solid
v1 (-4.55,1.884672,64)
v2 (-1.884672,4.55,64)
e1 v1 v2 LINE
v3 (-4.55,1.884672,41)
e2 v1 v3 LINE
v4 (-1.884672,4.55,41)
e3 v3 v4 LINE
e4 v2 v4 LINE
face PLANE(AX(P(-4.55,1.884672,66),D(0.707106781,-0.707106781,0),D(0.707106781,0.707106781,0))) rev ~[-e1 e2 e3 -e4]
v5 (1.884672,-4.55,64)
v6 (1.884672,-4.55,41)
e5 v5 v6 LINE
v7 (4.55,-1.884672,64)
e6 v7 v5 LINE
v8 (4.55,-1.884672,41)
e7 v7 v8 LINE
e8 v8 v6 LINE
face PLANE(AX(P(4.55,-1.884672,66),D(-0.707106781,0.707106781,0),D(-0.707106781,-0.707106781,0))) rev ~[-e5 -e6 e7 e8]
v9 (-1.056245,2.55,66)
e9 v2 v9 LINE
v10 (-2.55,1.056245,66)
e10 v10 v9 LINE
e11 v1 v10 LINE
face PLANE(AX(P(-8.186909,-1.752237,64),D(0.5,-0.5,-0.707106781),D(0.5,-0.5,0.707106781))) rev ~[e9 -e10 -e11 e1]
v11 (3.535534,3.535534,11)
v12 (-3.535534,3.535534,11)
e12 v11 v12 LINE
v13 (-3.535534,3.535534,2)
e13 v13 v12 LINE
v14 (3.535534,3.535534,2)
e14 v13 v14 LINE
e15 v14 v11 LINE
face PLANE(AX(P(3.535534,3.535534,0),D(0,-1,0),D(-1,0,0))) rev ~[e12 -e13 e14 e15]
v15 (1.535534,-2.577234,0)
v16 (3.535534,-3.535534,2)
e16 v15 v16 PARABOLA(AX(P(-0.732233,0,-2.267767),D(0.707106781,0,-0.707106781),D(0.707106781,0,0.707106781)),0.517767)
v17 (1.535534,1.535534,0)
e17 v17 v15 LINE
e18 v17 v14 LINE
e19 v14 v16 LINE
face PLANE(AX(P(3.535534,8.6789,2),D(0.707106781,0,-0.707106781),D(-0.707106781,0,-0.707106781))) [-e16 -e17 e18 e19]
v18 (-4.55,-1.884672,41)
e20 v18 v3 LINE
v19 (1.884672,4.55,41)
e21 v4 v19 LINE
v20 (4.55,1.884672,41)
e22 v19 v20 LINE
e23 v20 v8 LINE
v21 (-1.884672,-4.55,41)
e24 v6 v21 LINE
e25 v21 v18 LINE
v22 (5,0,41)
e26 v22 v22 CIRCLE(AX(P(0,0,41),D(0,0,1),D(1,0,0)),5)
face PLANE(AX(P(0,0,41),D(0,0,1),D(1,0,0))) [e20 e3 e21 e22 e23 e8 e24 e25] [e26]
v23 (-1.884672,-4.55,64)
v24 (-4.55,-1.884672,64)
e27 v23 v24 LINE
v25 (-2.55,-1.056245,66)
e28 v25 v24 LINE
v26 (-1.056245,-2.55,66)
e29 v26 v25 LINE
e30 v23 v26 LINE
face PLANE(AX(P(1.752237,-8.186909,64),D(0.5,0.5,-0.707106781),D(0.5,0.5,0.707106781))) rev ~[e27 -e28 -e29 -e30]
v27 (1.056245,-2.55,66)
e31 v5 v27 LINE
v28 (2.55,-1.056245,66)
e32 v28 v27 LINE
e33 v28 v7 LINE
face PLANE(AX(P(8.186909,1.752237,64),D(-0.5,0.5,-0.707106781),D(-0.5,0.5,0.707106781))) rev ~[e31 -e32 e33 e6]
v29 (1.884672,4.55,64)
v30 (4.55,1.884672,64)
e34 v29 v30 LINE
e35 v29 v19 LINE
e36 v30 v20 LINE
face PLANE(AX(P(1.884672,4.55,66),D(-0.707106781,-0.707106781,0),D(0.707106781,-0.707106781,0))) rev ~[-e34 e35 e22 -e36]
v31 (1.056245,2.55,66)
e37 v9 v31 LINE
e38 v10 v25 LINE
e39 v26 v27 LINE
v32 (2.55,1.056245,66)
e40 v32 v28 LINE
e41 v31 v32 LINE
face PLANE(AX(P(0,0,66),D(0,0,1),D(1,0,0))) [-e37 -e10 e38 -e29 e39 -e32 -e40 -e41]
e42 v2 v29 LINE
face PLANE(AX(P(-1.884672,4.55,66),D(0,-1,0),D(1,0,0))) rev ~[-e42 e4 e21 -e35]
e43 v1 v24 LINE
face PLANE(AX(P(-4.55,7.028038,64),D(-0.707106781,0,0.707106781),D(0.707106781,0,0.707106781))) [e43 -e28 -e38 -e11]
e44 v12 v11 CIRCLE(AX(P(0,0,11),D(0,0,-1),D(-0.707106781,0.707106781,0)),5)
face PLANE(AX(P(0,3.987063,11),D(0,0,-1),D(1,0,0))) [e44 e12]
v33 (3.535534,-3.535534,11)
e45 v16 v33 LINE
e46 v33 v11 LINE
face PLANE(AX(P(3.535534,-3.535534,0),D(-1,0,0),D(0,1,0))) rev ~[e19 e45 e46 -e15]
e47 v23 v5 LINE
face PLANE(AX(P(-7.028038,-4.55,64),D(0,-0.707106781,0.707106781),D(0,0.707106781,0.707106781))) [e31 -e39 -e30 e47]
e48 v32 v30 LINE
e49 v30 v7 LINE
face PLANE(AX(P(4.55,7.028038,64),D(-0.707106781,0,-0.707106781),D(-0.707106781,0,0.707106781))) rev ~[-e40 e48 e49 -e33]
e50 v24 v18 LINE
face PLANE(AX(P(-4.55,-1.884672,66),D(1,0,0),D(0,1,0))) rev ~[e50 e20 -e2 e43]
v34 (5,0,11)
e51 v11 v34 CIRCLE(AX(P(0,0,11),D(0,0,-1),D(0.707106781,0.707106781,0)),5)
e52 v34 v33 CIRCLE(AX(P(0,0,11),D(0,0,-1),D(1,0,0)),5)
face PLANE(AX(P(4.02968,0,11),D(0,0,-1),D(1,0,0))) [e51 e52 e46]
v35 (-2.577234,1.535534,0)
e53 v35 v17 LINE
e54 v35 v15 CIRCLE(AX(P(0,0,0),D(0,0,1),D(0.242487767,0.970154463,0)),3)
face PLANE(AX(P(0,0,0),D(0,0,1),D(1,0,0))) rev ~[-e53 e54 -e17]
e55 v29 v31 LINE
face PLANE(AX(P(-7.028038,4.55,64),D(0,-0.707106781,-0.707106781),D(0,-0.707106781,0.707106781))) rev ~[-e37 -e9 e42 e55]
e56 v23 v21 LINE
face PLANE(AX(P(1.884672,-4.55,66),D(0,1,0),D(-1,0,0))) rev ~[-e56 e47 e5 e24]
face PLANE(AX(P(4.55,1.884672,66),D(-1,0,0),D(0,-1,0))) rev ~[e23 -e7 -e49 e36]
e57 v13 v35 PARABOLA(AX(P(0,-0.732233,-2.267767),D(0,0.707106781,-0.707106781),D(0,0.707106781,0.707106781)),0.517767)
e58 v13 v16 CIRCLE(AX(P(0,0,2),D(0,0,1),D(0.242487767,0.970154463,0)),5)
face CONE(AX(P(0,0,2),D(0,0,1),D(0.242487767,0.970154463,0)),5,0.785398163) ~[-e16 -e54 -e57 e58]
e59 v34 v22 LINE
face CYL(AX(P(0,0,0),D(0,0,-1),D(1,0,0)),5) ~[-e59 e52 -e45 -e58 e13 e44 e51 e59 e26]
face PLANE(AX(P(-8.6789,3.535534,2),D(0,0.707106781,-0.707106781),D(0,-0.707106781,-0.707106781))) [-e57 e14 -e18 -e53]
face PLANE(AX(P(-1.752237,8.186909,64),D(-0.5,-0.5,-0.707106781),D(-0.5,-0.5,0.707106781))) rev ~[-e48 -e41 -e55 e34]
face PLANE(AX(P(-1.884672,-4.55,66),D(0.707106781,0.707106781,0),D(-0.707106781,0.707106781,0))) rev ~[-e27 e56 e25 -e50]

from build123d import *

# Parameters (mm, degrees)
F0_R         = 5
F1_DEPTH     = 66
F2_R         = 5
F3_DEPTH     = 25
F5_DEPTH     = 11
F6_T1_DEPTH  = 14.0560753695
F6_T3_DEPTH  = 14.0560753695
F6_T5_DEPTH  = 14.0560753695
F6_T7_DEPTH  = 14.0560753695
F6_T9_DEPTH  = 14.0560753695
F6_T11_DEPTH = 14.0560753695
F6_T13_DEPTH = 17.3577997637
F6_T15_DEPTH = 17.3577997637
F6_T18_ANGLE = 298.0668340959


# Not quite as in the source:
# - a fillet or chamfer that OpenCascade refuses, or shapes differently, is made with other operations: its cross-section is extruded or revolved along the edge and cut away or added


with BuildPart() as f1:
    # F0 (on Top) → F1 (new body)
    with BuildSketch(Plane.XY):
        Circle(F0_R)
    extrude(amount=F1_DEPTH)

    # F2 (on face) → F3 (cut)
    with BuildSketch(Plane.XY.offset(66)):
        Circle(F2_R)
        Polygon((4.55, 1.8846717088), (4.55, -1.8846717088), (1.8846717088, -4.55), (-1.8846717088, -4.55), (-4.55, -1.8846717088), (-4.55, 1.8846717088), (-1.8846717088, 4.55), (1.8846717088, 4.55), align=None, mode=Mode.SUBTRACT)
    extrude(amount=-F3_DEPTH, mode=Mode.SUBTRACT)

    # F4 (on face) → F5 (cut)
    with BuildSketch(Plane(origin=(0, 0, 0), x_dir=(1, 0, 0), z_dir=(0, 0, -1))):
        with BuildLine():
            ThreePointArc((5, 0), (4.6193976626, 1.9134171618), (3.5355339059, 3.5355339059))
            Line((3.5355339059, 3.5355339059), (3.5355339059, -3.5355339059))
            ThreePointArc((3.5355339059, -3.5355339059), (4.6193976626, -1.9134171618), (5, 0))
        make_face()
        with BuildLine():
            ThreePointArc((-3.5355339059, -3.5355339059), (0, -5), (3.5355339059, -3.5355339059))
            Line((3.5355339059, -3.5355339059), (-3.5355339059, -3.5355339059))
        make_face()
    extrude(amount=-F5_DEPTH, mode=Mode.SUBTRACT)

    # F6: chamfer of 2 on 11 edges, made by hand

    # F6_s2 → F6_t1 (cut)
    with BuildSketch(Plane(origin=(-4.9695731053, 4.9695731053, 0), x_dir=(0, 0, 1), z_dir=(0.7071067812, -0.7071067812, 0))):
        Polygon((64, -4.55), (66, -2.55), (66, -4.55), align=None)
    extrude(amount=F6_T1_DEPTH, mode=Mode.SUBTRACT)

    # F6_s4 → F6_t3 (cut)
    with BuildSketch(Plane.XZ.offset(-7.0280376847)):
        Polygon((4.55, 64), (2.55, 66), (4.55, 66), align=None)
        Polygon((-4.55, 64), (-2.55, 66), (-4.55, 66), align=None)
    extrude(amount=F6_T3_DEPTH, mode=Mode.SUBTRACT)

    # F6_s6 → F6_t5 (cut)
    with BuildSketch(Plane(origin=(4.9695731053, 4.9695731053, 0), x_dir=(0, 0, 1), z_dir=(-0.7071067812, -0.7071067812, 0))):
        Polygon((64, -4.55), (66, -2.55), (66, -4.55), align=None)
    extrude(amount=F6_T5_DEPTH, mode=Mode.SUBTRACT)

    # F6_s8 → F6_t7 (cut)
    with BuildSketch(Plane.YZ.offset(-7.0280376847)):
        Polygon((-4.55, 64), (-2.55, 66), (-4.55, 66), align=None)
        Polygon((4.55, 64), (2.55, 66), (4.55, 66), align=None)
    extrude(amount=F6_T7_DEPTH, mode=Mode.SUBTRACT)

    # F6_s10 → F6_t9 (cut)
    with BuildSketch(Plane(origin=(4.9695731053, -4.9695731053, 0), x_dir=(0, 0, 1), z_dir=(-0.7071067812, 0.7071067812, 0))):
        Polygon((64, -4.55), (66, -2.55), (66, -4.55), align=None)
    extrude(amount=F6_T9_DEPTH, mode=Mode.SUBTRACT)

    # F6_s12 → F6_t11 (cut)
    with BuildSketch(Plane(origin=(-4.9695731053, -4.9695731053, 0), x_dir=(0, 0, 1), z_dir=(0.7071067812, 0.7071067812, 0))):
        Polygon((64, -4.55), (66, -2.55), (66, -4.55), align=None)
    extrude(amount=F6_T11_DEPTH, mode=Mode.SUBTRACT)

    # F6_s14 → F6_t13 (cut)
    with BuildSketch(Plane.XZ.offset(-8.6788998819)):
        Polygon((3.5355339059, 2), (1.5355339059, 0), (3.5355339059, 0), align=None)
    extrude(amount=F6_T13_DEPTH, mode=Mode.SUBTRACT)

    # F6_s16 → F6_t15 (cut)
    with BuildSketch(Plane.YZ.offset(-8.6788998819)):
        Polygon((3.5355339059, 2), (1.5355339059, 0), (3.5355339059, 0), align=None)
    extrude(amount=F6_T15_DEPTH, mode=Mode.SUBTRACT)

    # F6_s17 → F6_t18 (revolve, cut)
    with BuildSketch(Plane(origin=(0, 0, 0), x_dir=(0, 0, 1), z_dir=(0.9701544633, -0.2424877673, 0))):
        Polygon((2, -5), (0, -3), (0, -5), align=None)
    revolve(axis=Axis((0, 0, 0), (0, 0, 1)), revolution_arc=F6_T18_ANGLE, mode=Mode.SUBTRACT)


solid = f1.part
